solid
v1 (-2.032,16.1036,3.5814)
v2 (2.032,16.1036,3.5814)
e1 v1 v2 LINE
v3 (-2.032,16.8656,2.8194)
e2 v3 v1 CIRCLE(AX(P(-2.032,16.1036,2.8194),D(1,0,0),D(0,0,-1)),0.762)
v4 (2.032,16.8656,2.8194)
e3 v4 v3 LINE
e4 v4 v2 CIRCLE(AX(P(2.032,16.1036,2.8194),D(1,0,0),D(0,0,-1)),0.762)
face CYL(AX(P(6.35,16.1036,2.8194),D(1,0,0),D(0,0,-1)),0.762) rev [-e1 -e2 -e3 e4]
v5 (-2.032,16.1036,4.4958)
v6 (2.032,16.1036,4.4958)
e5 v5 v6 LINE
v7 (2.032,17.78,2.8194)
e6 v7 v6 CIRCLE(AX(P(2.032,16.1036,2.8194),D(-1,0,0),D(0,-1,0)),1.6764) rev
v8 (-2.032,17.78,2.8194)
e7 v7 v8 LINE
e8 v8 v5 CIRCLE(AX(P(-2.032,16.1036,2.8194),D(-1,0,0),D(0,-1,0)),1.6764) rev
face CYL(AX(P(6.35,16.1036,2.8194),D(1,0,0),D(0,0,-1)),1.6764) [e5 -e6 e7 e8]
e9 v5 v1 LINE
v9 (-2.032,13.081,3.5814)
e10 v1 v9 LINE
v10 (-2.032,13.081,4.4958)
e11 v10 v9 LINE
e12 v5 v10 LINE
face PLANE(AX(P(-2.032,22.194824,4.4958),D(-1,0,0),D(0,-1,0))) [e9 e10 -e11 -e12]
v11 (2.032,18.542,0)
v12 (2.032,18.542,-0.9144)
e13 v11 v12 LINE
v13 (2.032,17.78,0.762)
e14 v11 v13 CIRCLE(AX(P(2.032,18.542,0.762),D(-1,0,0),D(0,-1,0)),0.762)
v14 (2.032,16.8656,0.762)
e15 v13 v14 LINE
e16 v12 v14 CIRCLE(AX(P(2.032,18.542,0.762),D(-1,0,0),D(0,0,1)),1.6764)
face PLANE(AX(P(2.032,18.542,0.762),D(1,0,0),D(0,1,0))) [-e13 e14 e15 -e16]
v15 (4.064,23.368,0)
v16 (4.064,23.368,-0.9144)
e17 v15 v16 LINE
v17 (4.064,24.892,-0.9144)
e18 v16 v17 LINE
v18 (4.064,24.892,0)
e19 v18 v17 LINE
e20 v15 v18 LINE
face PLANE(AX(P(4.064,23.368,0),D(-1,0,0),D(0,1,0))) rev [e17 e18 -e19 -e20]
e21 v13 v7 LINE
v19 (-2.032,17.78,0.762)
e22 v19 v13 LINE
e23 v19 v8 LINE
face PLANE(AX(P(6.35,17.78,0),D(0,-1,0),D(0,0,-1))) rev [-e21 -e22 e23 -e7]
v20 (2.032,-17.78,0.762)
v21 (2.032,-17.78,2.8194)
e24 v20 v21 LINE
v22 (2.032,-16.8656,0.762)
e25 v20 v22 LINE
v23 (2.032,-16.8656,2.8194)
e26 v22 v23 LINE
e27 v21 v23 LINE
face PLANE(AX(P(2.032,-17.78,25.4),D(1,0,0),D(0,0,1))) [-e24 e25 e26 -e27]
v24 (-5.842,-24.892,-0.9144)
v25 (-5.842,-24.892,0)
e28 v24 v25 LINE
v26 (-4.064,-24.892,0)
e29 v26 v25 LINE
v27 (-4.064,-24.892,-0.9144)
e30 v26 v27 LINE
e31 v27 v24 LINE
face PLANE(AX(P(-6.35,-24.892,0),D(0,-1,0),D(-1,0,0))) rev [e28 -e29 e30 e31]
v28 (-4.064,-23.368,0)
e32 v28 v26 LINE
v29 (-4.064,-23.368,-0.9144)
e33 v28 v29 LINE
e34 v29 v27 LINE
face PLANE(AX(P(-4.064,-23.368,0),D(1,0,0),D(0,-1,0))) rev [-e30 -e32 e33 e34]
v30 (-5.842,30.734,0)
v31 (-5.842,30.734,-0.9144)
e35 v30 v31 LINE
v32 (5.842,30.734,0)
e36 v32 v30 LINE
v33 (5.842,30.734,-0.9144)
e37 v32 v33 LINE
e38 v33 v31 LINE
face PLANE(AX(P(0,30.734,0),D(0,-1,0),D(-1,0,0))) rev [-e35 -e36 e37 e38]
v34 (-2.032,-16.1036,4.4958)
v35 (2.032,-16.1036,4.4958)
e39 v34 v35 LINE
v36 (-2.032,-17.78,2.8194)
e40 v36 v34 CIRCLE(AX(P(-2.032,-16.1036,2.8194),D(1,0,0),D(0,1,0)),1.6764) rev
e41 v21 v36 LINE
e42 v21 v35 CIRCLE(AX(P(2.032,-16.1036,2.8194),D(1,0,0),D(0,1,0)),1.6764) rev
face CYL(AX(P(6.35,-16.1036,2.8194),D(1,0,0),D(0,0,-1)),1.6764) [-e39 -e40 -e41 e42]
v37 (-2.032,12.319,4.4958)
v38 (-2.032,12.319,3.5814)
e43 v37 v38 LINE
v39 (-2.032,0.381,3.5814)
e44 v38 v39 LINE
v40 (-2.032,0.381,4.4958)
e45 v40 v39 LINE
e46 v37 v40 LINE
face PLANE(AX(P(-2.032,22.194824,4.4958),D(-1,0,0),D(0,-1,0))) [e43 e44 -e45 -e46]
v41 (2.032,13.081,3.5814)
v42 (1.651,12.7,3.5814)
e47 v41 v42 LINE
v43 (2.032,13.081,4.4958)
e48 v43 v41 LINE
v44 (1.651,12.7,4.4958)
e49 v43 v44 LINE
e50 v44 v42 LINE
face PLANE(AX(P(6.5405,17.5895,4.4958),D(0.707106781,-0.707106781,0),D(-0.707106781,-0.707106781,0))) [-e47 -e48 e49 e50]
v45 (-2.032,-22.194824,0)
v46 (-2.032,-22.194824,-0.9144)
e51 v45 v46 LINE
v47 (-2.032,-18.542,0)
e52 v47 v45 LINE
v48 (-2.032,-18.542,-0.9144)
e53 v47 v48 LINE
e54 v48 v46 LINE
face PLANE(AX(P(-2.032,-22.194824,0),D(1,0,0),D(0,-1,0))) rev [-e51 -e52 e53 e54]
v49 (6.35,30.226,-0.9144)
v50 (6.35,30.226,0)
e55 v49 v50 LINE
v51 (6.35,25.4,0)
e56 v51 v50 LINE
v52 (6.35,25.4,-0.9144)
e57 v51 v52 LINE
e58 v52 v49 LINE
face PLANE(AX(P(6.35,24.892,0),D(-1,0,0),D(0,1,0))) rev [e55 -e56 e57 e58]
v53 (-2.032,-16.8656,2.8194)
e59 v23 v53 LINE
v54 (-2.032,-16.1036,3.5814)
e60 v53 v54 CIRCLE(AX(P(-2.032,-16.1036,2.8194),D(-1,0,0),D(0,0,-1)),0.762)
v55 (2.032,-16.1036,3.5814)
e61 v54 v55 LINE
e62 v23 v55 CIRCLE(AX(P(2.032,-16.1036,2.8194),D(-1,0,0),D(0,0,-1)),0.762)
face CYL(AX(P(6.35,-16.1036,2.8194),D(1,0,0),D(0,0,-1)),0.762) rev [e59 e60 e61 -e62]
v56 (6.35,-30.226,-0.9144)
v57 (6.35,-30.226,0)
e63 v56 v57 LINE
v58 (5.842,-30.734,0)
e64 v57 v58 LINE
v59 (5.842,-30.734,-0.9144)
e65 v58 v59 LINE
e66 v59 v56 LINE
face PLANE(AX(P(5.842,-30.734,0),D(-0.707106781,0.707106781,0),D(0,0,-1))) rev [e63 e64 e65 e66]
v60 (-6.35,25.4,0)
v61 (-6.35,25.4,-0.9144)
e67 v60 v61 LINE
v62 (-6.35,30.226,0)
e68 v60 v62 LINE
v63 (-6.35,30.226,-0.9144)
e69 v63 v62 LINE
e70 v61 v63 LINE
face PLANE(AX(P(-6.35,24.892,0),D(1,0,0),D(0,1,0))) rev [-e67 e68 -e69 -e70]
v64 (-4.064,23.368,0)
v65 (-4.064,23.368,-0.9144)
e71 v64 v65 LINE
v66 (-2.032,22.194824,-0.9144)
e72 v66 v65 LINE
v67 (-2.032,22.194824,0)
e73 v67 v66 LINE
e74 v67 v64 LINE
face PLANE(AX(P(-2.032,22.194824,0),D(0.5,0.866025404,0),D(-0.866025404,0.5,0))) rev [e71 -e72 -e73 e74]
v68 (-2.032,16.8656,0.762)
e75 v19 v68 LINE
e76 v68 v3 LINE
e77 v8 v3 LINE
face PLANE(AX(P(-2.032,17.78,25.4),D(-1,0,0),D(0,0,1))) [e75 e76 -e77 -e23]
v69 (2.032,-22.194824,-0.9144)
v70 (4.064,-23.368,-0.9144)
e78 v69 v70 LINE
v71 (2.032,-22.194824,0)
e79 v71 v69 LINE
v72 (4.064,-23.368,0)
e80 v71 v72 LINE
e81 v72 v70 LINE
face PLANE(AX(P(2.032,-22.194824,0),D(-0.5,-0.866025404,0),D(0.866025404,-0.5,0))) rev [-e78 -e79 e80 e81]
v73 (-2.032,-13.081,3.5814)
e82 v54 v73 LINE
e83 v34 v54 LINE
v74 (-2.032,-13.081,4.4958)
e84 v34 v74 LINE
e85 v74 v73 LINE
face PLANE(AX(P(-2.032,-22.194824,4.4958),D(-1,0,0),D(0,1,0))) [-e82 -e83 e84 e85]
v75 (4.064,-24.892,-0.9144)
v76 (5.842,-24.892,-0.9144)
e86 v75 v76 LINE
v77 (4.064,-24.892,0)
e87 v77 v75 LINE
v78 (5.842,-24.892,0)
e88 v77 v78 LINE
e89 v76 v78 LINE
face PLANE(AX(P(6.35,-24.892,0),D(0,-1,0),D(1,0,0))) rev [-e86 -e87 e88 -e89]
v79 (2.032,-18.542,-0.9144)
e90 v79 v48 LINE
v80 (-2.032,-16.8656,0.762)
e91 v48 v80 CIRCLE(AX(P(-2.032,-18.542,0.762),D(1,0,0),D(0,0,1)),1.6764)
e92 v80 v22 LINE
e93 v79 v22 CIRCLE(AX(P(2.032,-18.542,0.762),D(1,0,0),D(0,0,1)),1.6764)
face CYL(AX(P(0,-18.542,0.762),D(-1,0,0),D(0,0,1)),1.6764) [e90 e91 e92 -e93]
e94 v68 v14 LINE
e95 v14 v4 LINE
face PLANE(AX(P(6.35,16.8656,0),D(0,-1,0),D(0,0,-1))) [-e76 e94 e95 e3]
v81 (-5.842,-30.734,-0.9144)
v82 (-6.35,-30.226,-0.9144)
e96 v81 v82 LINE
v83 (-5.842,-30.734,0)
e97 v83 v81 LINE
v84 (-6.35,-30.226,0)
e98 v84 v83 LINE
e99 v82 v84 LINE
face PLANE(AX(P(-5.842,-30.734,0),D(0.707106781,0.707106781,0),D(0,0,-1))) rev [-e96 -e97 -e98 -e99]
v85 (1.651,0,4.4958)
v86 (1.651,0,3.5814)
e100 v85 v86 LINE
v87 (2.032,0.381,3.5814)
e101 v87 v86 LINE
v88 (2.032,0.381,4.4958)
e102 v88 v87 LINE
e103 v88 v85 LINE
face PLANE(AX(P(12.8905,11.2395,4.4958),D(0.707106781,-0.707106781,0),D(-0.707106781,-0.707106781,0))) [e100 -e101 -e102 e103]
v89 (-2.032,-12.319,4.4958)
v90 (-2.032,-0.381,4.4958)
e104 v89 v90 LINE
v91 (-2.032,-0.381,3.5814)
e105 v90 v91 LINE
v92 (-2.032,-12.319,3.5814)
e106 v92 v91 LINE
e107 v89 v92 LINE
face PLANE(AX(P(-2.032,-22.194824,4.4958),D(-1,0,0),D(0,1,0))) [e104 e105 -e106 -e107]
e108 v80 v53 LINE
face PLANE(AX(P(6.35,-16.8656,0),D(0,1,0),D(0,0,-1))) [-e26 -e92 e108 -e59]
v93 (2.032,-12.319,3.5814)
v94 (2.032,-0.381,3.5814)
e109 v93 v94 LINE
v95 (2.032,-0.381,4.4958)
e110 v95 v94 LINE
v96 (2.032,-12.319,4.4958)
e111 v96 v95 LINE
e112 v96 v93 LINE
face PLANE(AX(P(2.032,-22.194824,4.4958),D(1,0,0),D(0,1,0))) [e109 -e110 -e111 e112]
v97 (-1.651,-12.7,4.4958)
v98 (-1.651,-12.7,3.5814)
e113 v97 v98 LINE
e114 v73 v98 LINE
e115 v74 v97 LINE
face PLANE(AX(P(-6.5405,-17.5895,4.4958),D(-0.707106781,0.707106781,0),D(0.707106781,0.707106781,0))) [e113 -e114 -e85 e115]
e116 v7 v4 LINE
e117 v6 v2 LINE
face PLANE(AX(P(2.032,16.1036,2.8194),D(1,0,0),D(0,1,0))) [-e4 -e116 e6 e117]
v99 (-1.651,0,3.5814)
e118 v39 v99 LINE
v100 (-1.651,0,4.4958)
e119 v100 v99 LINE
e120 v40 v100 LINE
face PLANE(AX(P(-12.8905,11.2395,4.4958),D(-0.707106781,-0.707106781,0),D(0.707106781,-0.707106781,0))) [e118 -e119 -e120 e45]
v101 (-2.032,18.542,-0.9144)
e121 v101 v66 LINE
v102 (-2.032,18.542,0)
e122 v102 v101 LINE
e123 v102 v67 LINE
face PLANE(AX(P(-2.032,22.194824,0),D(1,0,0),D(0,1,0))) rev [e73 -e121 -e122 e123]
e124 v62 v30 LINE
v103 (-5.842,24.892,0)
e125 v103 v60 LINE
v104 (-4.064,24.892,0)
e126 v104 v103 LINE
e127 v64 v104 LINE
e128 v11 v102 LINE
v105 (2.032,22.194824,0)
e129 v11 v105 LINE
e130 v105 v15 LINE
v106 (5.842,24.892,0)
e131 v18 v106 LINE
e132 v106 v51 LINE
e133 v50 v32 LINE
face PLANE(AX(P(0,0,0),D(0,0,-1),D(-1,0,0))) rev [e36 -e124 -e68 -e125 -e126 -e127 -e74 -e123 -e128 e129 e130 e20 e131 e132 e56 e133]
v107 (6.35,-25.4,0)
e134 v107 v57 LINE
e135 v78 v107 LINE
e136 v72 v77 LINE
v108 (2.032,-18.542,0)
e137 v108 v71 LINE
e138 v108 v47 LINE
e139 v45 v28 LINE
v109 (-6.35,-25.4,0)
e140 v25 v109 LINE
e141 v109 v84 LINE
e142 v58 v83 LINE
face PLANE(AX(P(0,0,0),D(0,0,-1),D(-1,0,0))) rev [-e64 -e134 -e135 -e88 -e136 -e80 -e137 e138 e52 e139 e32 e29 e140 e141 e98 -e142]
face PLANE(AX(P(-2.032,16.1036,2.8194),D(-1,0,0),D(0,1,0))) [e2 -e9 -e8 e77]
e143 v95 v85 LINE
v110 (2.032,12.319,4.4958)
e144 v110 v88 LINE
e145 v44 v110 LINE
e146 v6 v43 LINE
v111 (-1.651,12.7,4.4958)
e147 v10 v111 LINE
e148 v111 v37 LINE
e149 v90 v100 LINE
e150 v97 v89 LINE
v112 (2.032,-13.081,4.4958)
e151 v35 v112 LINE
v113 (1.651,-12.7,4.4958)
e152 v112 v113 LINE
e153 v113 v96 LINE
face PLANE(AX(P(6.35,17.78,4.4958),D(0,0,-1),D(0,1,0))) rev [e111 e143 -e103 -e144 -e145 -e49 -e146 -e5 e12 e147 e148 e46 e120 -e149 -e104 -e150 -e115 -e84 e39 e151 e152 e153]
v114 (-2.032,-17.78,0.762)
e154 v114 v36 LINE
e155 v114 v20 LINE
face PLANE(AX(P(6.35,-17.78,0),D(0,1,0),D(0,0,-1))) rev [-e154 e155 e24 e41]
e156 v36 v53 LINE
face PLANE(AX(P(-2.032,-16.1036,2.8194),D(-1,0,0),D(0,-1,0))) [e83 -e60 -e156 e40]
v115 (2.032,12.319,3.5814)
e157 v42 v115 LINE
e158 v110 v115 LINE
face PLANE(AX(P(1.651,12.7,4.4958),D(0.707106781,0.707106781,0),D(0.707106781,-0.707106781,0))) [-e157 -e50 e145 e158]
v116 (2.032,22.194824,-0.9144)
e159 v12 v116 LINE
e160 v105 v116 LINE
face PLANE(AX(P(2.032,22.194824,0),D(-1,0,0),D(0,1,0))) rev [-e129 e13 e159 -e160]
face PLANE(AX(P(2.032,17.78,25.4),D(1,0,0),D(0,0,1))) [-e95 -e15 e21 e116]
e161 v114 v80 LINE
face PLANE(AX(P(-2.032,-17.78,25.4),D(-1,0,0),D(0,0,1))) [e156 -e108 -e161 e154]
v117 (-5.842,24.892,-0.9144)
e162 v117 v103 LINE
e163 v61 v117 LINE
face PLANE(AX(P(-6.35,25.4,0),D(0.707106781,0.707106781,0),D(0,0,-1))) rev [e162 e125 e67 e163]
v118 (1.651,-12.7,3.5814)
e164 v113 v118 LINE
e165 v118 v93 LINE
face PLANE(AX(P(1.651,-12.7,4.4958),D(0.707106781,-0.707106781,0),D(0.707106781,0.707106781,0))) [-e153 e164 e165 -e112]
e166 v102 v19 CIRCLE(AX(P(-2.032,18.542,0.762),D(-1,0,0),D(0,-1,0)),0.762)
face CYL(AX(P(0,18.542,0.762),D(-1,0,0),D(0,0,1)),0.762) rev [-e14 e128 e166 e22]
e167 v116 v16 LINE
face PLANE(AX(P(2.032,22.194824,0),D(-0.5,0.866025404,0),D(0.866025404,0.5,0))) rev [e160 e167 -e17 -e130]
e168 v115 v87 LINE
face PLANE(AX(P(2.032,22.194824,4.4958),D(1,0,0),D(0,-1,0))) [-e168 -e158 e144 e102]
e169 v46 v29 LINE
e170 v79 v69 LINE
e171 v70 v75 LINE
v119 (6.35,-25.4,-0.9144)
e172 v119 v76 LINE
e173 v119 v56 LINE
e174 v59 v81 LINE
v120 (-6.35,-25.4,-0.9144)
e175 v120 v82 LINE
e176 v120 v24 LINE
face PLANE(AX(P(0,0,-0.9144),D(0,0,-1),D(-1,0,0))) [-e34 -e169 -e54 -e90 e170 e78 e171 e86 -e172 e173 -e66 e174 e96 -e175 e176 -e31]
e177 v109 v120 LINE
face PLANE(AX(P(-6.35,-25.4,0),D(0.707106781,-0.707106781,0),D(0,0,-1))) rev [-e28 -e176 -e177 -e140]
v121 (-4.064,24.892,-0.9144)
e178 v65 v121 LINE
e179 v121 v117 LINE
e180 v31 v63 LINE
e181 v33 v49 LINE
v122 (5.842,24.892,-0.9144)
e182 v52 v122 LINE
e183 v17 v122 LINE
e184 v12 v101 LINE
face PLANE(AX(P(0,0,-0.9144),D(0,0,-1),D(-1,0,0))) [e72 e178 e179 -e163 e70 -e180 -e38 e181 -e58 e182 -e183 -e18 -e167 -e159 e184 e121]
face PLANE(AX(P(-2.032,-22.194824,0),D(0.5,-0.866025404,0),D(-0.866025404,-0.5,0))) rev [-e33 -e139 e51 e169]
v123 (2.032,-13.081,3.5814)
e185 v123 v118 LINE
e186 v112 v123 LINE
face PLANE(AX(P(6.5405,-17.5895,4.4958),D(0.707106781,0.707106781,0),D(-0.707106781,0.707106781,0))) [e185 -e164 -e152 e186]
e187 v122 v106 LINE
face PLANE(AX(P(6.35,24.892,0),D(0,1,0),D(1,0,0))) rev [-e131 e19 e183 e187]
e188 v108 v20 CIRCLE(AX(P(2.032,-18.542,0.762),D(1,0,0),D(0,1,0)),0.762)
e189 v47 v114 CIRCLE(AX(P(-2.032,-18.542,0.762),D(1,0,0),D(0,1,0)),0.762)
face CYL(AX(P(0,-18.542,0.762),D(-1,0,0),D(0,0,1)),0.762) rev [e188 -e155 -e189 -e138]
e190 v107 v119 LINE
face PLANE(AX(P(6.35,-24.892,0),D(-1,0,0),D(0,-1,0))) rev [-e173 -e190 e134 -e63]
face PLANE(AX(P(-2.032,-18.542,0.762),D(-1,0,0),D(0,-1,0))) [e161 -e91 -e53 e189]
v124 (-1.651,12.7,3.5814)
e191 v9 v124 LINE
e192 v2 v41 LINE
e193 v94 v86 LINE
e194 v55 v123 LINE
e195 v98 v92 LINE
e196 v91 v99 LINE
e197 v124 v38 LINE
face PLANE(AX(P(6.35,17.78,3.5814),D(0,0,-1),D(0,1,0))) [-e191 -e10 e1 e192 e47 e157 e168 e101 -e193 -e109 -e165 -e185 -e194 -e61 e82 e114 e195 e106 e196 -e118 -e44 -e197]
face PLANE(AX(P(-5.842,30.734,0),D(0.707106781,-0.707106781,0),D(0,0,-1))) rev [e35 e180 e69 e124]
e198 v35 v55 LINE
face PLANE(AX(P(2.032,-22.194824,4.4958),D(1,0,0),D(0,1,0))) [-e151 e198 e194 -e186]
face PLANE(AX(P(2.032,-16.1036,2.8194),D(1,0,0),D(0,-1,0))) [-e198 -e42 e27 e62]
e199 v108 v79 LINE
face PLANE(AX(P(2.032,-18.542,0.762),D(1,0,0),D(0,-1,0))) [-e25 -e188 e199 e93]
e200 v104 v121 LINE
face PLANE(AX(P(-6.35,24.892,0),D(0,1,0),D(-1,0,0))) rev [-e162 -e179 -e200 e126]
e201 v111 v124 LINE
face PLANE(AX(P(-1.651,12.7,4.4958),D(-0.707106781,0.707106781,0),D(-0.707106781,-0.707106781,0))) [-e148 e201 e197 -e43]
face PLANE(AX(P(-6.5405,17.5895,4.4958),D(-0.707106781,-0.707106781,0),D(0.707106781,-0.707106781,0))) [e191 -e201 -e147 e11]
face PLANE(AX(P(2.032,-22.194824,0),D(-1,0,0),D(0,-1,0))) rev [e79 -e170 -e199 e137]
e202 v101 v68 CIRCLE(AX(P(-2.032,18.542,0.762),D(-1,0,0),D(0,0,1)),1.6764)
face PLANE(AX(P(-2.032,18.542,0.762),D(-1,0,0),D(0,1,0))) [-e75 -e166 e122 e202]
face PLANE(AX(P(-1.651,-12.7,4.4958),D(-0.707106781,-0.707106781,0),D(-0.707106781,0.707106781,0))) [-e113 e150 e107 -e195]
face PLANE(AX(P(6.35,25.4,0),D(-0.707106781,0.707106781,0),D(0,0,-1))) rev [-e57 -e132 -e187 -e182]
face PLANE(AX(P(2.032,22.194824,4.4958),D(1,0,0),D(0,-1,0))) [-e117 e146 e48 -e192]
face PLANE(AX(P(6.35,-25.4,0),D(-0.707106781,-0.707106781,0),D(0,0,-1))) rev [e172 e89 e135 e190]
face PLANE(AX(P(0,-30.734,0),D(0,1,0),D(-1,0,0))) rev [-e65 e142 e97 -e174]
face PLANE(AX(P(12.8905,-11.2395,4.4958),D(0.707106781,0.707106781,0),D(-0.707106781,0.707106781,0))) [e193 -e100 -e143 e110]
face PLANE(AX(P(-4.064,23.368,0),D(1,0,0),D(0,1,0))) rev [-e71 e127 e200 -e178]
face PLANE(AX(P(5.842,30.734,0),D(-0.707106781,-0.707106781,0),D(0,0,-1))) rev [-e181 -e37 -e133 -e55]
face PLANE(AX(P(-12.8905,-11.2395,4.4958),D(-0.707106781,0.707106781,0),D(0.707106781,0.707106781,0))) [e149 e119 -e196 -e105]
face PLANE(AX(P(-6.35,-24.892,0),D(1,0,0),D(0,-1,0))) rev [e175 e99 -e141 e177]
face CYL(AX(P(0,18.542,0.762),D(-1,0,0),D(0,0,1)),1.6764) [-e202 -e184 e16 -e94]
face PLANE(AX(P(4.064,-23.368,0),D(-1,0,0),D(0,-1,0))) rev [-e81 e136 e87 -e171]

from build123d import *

# Parameters (mm, degrees)
BOSS_EXTRUDE1_DEPTH        = 25.4
SKETCH13_W                 = 4.4958
SKETCH13_H                 = 17.78
CUT_EXTRUDE2_DEPTH         = 41.37401709
CONVERT_SOLID1_DEPTH       = 6.35
CONVERT_SOLID1_2_DEPTH     = 2.032
CONVERT_SOLID1_START       = 2.032
CONVERT_SOLID1_3_OUTLINE_W = 5.842
CONVERT_SOLID1_3_OUTLINE_H = 0.9144
CONVERT_SOLID1_3_DEPTH     = 4.318
CONVERT_SOLID1_START_2     = -0.9144
CONVERT_SOLID1_4_DEPTH     = 0.9144
CHAMFER1_SIZE              = 0.508
CUT_EXTRUDE3_DEPTH         = 32.703524625


with BuildPart() as part:
    # Sketch3 → Boss-Extrude1 (new body)
    with BuildSketch(Plane.XY):
        Polygon((6.35, 24.892), (6.35, 30.734), (0, 30.734), (0, 0), (2.032, 0), (2.032, 22.194824253), (4.064, 23.368), (4.064, 24.892), align=None)
    extrude(amount=BOSS_EXTRUDE1_DEPTH)

    # Sketch13 → Cut-Extrude2 (cut, through all)
    with BuildSketch(Plane(origin=(0, 0, 0), x_dir=(0, 0, -1), z_dir=(1, 0, 0))):
        with Locations((-2.2479, 8.89)):
            Rectangle(SKETCH13_W, SKETCH13_H)
    extrude(amount=CUT_EXTRUDE2_DEPTH, mode=Mode.SUBTRACT)

    # Convert-Solid1: read off the stored shape, not the designer's step
    # Convert-Solid1 outline → Convert-Solid1 (cut)
    with BuildSketch(Plane.YZ):
        with BuildLine():
            Line((30.734, 0), (30.734, 25.4))
            Line((30.734, 25.4), (0, 25.4))
            Line((0, 25.4), (0, 4.4958))
            Line((0, 4.4958), (17.78, 4.4958))
            Line((17.78, 4.4958), (17.78, 0.762))
            ThreePointArc((17.78, 0.762), (18.003184633, 0.223184633), (18.542, 0))
            Line((18.542, 0), (30.734, 0))
        make_face()
    extrude(amount=CONVERT_SOLID1_DEPTH, mode=Mode.SUBTRACT)

    # Convert-Solid1 2 outline → Convert-Solid1 2 (add)
    with BuildSketch(Plane.YZ):
        with BuildLine():
            Line((30.734, -0.9144), (30.734, 0))
            Line((30.734, 0), (17.78, 0))
            Line((17.78, 0), (17.78, 2.8194))
            ThreePointArc((17.78, 2.8194), (17.288993808, 4.004793808), (16.1036, 4.4958))
            Line((16.1036, 4.4958), (0, 4.4958))
            Line((0, 4.4958), (0, 3.5814))
            Line((0, 3.5814), (16.1036, 3.5814))
            ThreePointArc((16.1036, 3.5814), (16.642415367, 3.358215367), (16.8656, 2.8194))
            Line((16.8656, 2.8194), (16.8656, 0.762))
            ThreePointArc((16.8656, 0.762), (17.356606192, -0.423393808), (18.542, -0.9144))
            Line((18.542, -0.9144), (30.734, -0.9144))
        make_face()
    extrude(amount=CONVERT_SOLID1_2_DEPTH)

    # Convert-Solid1 3 outline → Convert-Solid1 3 (add)
    with BuildSketch(Plane.YZ.offset(CONVERT_SOLID1_START)):
        with Locations((27.813, -0.4572)):
            Rectangle(CONVERT_SOLID1_3_OUTLINE_W, CONVERT_SOLID1_3_OUTLINE_H)
    extrude(amount=CONVERT_SOLID1_3_DEPTH)

    # Convert-Solid1 4 outline → Convert-Solid1 4 (add)
    with BuildSketch(Plane.XY.offset(CONVERT_SOLID1_START_2)):
        Polygon((4.064, 23.368), (4.064, 24.892), (2.032, 24.892), (2.032, 22.194824253), align=None)
    extrude(amount=CONVERT_SOLID1_4_DEPTH)

    # Chamfer1
    chamfer1_edges = [part.edges().sort_by_distance(p)[0] for p in [
        (6.35, 24.892, -0.4572),
        (6.35, 30.734, -0.4572),
    ]]
    chamfer(chamfer1_edges, length=CHAMFER1_SIZE)

    # Sketch14 → Cut-Extrude3 (cut, through all)
    with BuildSketch(Plane.XY):
        Polygon((5.08, 16.129), (1.651, 12.7), (5.08, 9.271), align=None)
        Polygon((1.651, 0), (5.08, 3.429), (5.08, -3.429), align=None)
    extrude(amount=CUT_EXTRUDE3_DEPTH, mode=Mode.SUBTRACT)

    # Mirror1: part across plane


with BuildPart() as part_1:
    add(part.part)
    add(part.part.mirror(Plane(origin=(0, 0, 0), x_dir=(0, 0, 1), z_dir=(1, 0, 0))))

    # Mirror2: part across face


with BuildPart() as part_2:
    add(part_1.part)
    add(part_1.part.mirror(Plane(origin=(0, 0, 4.0386), x_dir=(0, 0, 1), z_dir=(0, -1, 0))))


solid = part_2.part
